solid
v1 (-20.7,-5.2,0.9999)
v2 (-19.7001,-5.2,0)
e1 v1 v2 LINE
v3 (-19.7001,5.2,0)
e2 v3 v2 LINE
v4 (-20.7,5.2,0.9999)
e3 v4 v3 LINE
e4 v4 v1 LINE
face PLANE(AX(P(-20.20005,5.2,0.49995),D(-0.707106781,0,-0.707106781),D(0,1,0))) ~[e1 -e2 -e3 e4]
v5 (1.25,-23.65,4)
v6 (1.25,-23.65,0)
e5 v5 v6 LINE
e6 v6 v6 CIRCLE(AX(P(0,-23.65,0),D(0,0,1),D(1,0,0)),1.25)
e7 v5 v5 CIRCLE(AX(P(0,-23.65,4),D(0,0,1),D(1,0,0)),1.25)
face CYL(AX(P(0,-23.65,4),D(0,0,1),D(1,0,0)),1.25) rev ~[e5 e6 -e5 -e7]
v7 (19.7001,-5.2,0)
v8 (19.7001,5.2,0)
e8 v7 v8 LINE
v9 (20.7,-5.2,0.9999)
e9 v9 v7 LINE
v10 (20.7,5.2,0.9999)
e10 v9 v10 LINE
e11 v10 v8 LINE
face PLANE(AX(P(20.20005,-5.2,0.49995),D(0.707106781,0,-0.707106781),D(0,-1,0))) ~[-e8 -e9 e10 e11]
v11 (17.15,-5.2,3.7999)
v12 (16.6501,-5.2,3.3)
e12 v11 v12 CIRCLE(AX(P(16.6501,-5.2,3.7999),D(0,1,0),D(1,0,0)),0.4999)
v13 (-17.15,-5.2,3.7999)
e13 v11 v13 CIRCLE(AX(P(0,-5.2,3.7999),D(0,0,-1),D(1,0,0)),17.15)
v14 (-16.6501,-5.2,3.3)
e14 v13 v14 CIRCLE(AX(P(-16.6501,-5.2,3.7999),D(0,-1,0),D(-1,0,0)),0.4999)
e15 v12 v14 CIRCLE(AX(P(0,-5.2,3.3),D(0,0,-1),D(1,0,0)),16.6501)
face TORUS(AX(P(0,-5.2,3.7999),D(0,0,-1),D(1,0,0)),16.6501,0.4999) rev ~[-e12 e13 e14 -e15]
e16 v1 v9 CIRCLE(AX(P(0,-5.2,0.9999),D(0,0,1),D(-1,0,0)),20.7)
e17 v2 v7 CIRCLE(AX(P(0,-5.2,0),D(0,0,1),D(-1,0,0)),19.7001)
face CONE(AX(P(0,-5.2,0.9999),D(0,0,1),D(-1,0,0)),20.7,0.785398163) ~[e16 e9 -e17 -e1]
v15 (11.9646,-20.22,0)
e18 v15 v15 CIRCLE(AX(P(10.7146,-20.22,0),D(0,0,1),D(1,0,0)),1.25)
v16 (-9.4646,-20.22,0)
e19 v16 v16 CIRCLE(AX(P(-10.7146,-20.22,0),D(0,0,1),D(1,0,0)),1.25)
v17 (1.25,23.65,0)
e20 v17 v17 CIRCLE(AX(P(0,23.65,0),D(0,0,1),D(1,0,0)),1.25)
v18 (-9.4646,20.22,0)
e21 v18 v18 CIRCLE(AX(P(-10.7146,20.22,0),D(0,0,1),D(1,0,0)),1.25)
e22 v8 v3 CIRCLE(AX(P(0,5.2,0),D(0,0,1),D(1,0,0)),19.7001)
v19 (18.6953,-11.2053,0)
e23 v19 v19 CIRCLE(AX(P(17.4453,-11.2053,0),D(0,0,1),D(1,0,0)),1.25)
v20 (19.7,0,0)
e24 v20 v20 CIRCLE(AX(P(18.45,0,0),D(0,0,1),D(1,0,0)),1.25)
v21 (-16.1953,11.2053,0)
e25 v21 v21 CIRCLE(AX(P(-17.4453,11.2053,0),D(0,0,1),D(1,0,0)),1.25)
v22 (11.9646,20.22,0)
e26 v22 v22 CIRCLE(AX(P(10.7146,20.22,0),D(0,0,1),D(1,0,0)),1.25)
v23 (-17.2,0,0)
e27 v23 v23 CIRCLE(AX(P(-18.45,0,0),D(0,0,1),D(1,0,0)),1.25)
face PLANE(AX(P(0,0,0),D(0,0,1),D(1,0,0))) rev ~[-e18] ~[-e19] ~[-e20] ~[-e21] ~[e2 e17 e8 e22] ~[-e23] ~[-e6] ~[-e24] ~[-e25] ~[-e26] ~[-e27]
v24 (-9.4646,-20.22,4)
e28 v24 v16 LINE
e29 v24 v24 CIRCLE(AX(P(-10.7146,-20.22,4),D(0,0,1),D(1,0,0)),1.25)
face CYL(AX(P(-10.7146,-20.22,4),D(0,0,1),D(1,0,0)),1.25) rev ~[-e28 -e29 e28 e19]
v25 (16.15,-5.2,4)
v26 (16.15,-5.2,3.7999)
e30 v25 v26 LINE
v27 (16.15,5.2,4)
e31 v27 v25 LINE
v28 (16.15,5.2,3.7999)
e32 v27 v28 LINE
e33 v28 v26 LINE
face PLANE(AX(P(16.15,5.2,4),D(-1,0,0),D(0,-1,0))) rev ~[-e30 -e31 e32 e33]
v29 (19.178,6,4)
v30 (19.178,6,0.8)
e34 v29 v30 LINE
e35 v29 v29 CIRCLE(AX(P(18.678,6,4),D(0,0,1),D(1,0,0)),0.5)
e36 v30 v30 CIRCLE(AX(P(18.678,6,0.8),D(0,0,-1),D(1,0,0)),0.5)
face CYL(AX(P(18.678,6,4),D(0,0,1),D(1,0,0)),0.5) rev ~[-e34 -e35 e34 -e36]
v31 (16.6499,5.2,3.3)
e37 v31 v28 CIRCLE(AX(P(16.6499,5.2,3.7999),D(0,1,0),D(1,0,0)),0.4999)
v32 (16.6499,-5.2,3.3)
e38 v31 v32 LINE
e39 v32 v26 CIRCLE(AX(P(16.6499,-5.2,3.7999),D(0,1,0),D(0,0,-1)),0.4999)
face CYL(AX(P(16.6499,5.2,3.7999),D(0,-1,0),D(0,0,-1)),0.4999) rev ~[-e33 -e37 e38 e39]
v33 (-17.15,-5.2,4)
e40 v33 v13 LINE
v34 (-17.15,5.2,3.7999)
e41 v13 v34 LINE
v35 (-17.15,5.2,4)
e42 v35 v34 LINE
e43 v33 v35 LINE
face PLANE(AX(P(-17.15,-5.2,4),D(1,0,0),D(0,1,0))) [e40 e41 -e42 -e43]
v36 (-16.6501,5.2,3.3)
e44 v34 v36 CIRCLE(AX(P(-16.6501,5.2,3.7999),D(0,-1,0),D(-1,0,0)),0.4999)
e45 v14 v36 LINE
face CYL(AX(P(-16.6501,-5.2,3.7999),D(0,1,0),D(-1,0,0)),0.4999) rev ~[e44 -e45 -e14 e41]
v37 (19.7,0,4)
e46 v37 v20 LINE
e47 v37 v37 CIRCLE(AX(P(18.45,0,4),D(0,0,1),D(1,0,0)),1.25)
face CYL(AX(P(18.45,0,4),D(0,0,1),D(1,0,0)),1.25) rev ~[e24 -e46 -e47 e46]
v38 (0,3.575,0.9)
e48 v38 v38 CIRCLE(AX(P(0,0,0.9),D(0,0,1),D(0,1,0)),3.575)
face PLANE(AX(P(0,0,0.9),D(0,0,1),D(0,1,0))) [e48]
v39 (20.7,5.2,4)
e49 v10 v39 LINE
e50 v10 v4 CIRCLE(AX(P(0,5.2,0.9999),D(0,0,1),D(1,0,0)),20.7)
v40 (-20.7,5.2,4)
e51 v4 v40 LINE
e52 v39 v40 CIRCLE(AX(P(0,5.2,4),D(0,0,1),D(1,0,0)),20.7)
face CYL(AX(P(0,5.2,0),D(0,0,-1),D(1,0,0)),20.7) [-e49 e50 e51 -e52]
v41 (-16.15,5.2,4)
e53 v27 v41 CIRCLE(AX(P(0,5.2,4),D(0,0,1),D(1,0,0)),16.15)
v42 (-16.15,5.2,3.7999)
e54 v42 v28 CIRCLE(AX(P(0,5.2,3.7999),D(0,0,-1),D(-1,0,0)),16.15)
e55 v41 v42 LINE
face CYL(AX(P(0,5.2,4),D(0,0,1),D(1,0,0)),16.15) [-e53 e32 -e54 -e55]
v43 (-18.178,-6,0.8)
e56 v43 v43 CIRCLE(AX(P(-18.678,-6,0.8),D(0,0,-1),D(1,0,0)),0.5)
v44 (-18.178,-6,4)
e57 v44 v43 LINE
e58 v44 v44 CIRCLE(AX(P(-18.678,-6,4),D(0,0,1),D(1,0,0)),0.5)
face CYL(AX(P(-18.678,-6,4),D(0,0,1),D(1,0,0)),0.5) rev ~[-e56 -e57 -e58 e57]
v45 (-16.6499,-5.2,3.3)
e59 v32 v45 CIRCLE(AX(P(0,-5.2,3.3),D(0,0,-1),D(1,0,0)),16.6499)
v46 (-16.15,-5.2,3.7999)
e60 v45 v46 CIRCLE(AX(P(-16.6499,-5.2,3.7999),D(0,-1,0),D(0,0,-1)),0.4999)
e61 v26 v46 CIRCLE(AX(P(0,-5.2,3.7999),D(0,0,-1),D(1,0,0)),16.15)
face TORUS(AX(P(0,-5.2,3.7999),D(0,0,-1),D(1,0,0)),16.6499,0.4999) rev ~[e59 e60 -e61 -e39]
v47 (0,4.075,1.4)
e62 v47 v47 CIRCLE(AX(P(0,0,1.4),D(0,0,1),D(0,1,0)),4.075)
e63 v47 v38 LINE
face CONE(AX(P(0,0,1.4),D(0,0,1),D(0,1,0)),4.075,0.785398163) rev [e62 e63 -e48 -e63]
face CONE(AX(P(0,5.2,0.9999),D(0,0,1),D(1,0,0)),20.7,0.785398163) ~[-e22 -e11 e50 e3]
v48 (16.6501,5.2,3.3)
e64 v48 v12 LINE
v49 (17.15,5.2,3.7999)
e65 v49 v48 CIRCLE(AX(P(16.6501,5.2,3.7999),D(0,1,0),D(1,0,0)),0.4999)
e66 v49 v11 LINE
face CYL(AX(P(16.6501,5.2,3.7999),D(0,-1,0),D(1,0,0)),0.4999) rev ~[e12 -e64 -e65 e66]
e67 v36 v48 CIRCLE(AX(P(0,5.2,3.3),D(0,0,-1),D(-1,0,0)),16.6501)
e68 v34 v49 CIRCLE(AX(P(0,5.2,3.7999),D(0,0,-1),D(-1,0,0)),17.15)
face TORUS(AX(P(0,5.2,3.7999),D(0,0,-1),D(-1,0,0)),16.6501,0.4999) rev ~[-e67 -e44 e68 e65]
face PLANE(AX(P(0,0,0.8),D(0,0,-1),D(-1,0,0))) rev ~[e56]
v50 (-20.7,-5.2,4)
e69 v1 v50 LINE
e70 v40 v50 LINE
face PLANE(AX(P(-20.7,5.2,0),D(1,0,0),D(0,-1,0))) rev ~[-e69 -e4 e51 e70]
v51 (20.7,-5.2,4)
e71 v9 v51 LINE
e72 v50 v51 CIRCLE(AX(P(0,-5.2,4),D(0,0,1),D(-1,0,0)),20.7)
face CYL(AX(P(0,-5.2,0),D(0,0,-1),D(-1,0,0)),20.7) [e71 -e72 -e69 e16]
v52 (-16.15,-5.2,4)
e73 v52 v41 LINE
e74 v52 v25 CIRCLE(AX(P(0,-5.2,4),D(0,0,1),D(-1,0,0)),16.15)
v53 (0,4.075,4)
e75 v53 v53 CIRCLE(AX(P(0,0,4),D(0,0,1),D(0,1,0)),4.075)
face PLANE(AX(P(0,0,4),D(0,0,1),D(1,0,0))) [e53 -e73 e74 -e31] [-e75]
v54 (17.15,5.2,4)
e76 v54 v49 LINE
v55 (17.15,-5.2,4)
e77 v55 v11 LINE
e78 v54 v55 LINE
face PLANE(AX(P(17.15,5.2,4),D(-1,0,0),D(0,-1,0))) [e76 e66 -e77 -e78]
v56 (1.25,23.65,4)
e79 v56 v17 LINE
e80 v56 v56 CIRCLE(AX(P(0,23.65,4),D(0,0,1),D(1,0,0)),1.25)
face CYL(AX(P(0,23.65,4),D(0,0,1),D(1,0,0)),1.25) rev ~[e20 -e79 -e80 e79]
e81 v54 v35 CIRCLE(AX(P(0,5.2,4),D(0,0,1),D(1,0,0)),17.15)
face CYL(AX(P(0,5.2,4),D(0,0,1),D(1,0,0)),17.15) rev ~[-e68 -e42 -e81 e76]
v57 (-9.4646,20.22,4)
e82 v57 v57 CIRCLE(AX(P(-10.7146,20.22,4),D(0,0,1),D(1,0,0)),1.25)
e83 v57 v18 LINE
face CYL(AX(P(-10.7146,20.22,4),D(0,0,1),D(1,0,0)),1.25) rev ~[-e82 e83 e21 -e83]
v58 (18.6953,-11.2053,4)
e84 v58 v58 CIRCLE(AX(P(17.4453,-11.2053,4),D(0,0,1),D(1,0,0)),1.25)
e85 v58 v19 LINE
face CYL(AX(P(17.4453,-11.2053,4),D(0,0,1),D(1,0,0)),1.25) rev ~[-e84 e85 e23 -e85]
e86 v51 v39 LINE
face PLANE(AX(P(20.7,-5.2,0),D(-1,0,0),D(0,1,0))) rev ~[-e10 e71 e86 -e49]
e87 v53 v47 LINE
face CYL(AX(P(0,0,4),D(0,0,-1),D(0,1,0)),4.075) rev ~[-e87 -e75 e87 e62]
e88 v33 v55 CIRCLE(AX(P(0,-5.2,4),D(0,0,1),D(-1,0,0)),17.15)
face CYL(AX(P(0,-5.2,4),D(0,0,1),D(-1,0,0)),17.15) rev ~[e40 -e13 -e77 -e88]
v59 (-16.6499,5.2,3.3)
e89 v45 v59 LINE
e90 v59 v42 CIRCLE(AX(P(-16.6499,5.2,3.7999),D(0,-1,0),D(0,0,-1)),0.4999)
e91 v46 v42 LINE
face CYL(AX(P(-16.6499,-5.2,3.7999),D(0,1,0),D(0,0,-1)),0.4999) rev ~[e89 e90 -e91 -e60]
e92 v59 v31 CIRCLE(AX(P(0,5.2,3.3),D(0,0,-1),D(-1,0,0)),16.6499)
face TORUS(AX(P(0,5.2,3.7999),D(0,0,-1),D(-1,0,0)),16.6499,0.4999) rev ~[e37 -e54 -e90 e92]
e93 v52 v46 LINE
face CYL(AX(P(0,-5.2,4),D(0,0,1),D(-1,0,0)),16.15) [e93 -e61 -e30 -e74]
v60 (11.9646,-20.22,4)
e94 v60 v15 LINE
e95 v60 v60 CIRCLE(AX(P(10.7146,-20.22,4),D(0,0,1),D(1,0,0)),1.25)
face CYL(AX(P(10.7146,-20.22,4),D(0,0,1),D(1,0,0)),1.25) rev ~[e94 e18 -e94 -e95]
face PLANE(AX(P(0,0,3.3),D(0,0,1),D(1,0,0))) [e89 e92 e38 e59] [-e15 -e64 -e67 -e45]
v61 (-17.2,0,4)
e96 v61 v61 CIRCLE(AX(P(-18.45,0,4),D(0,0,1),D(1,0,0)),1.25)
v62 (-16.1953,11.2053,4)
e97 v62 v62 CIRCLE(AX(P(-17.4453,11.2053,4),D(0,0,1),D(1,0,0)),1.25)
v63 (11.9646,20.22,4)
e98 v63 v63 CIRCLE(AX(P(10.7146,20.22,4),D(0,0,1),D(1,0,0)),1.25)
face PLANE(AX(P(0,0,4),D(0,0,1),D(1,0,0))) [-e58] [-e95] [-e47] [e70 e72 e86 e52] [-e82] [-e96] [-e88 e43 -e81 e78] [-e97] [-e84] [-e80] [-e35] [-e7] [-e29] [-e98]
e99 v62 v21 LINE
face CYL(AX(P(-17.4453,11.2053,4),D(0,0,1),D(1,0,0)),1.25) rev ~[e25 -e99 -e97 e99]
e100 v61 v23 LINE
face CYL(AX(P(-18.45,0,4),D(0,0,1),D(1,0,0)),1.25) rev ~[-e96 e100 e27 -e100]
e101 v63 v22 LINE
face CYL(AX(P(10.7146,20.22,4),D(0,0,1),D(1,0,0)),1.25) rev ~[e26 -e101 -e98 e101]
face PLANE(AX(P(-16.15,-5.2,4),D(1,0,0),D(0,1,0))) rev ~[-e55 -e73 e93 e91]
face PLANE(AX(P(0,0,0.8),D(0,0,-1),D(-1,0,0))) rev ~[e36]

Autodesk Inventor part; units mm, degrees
ref_plane "YZ Plane" through (0, 0, 0) normal (1, 0, 0) x (0, 1, 0)
ref_plane "XZ Plane" through (0, 0, 0) normal (0, 1, 0) x (-1, 0, 0)
ref_plane "XY Plane" through (0, 0, 0) normal (0, 0, 1) x (1, 0, 0)
sketch "Sketch1" plane through (0, 0, 0) normal (0, 0, 1) x (1, 0, 0)
  line L0 (0, 0) -> (0, 5.2) construction
  arc A0 (15.7051, 1.2264) -> (-15.7051, 1.2264) centre (0, 5.2) ccw construction
  line L1 (0, 0) -> (0, -5.2) construction
  arc A1 (-15.7051, -1.2264) -> (15.7051, -1.2264) centre (0, -5.2) ccw construction
  line L2 (0, 5.2) -> (0, -5.2) construction
  line L3 (-20.7, 5.2) -> (-20.7, -5.2)
  line L4 (20.7, -5.2) -> (20.7, 5.2)
  arc A2 (20.7, 5.2) -> (-20.7, 5.2) centre (0, 5.2) ccw
  arc A3 (-20.7, -5.2) -> (20.7, -5.2) centre (0, -5.2) ccw
  arc A4 (-15.7051, -1.2264) -> (-15.7051, 1.2264) centre (-20.5524, 0) ccw construction
  arc A5 (15.7051, 1.2264) -> (15.7051, -1.2264) centre (20.5524, 0) ccw construction
  line L5 (0, 5.2) -> (0, -5.2) construction
  circle A6 centre (0, 0) radius 14.5 construction
  dimension "d0" = 10.4
  dimension "d1" = 16.2
  dimension "d2" = 4.5
  dimension "d3" = 5
  dimension "d4" = 41.4
  dimension "d8" = 29
extrude "Extrusion1" add sketch "Sketch1" along normal blind 4
sketch "Sketch2" plane through (0, 0, 4) normal (0, 0, 1) x (1, 0, 0)
  line L0 (-20.7, 5.2) -> (-20.7, -5.2) construction
  arc A0 (-20.7, -5.2) -> (20.7, -5.2) centre (0, -5.2) ccw construction
  line L1 (20.7, -5.2) -> (20.7, 5.2) construction
  arc A1 (20.7, 5.2) -> (-20.7, 5.2) centre (0, 5.2) ccw construction
  line L2 (-18.45, 5.2) -> (-18.45, -5.2) construction
  arc A2 (-18.45, -5.2) -> (18.45, -5.2) centre (0, -5.2) ccw construction
  line L3 (18.45, -5.2) -> (18.45, 5.2) construction
  arc A3 (18.45, 5.2) -> (-18.45, 5.2) centre (0, 5.2) ccw construction
  circle A4 centre (-18.45, 0) radius 1.25
  circle A5 centre (0, 23.65) radius 1.25
  circle A6 centre (-10.7146, 20.22) radius 1.25
  circle A7 centre (-17.4453, 11.2053) radius 1.25
  line L4 (-18.45, 0) -> (-17.4453, 11.2053) construction
  line L5 (-17.4453, 11.2053) -> (-10.7146, 20.22) construction
  line L6 (-10.7146, 20.22) -> (0, 23.65) construction
  line L7 (-18.45, 0) -> (0, 0) construction
  line L8 (0, 0) -> (0, 23.65) construction
  circle A8 centre (18.45, 0) radius 1.25
  circle A9 centre (10.7146, 20.22) radius 1.25
  circle A10 centre (17.4453, 11.2053) radius 1.25
  circle A11 centre (0, -23.65) radius 1.25
  circle A12 centre (-10.7146, -20.22) radius 1.25
  circle A13 centre (-17.4453, -11.2053) radius 1.25
  circle A14 centre (10.7146, -20.22) radius 1.25
  circle A15 centre (17.4453, -11.2053) radius 1.25
  line L9 (-18.45, 0) -> (-18.45, -6) construction
  line L10 (-18.45, -6) -> (-18.678, -6) construction
  line L11 (18.45, 0) -> (18.45, 6) construction
  line L12 (18.45, 6) -> (18.678, 6) construction
  circle A16 centre (-18.678, -6) radius 0.5
  circle A17 centre (18.678, 6) radius 0.5
  dimension "d37" = 2.25
  dimension "d38" = 2.5
  dimension "d39" = 6
  dimension "d40" = 0.228
  dimension "d41" = 6
  dimension "d42" = 0.228
  dimension "d43" = 1
extrude "Extrusion2" cut sketch "Sketch2" against normal through all contours A4 | A5 | A6 | A7 | A8 | A9 | A11 | A12 | A14 | A15 | A16 | A17
sketch "Sketch5" plane through (0, 0, 4) normal (0, 0, 1) x (1, 0, 0)
  line L0 (20.7, -5.2) -> (20.7, 5.2) construction
  arc A0 (20.7, 5.2) -> (-20.7, 5.2) centre (0, 5.2) ccw construction
  line L1 (-20.7, 5.2) -> (-20.7, -5.2) construction
  arc A1 (-20.7, -5.2) -> (20.7, -5.2) centre (0, -5.2) ccw construction
  arc A2 (17.15, 5.2) -> (-17.15, 5.2) centre (0, 5.2) ccw
  line L2 (17.15, 5.2) -> (17.15, -5.2)
  arc A3 (-17.15, -5.2) -> (17.15, -5.2) centre (0, -5.2) ccw
  line L3 (-17.15, -5.2) -> (-17.15, 5.2)
  arc A4 (16.15, 5.2) -> (-16.15, 5.2) centre (0, 5.2) ccw
  line L4 (16.15, 5.2) -> (16.15, -5.2)
  arc A5 (-16.15, -5.2) -> (16.15, -5.2) centre (0, -5.2) ccw
  line L5 (-16.15, -5.2) -> (-16.15, 5.2)
  point P0 (0, 0)
  dimension "d20" = 1
extrude "Extrusion5" cut sketch "Sketch5" against normal blind 0.7
fillet "Fillet1" radius 0.5 8 edges at (17.15, 0, 3.3) (0, -22.35, 3.3) (-17.15, 0, 3.3) (0, 22.35, 3.3) (-16.15, 0, 3.3) (0, -21.35, 3.3) (16.15, 0, 3.3) (0, 21.35, 3.3)
chamfer "Chamfer1" distance 1 angle 45 4 edges at (0, -25.9, 0) (20.7, 0, 0) (0, 25.9, 0) (-20.7, 0, 0)
sketch "Sketch8" plane through (0, 0, 0) normal (1, 0, 0) x (0, 1, 0)
  line L0 (0, 0) -> (5.2, 0) construction
  line L1 (0, 0) -> (0, 0.9) construction
  line L2 (-5.2, 4) -> (5.2, 4) construction
  line L3 (0, 4) -> (4.075, 4)
  line L4 (4.075, 4) -> (4.075, 1.4)
  line L5 (4.075, 1.4) -> (3.575, 0.9)
  line L6 (3.575, 0.9) -> (0, 0.9)
  line L7 (0, 0.9) -> (0, 4)
  dimension "d44" = 4.075
  dimension "d45" = 135
  dimension "d46" = 2.6
  dimension "d47" = 0.5
  dimension "d48" = 0.9
revolve "Revolution1" cut sketch "Sketch8" angle 360 about axis through (0, 0, 0.9) along (0, 0, 1)
sketch "Sketch9" plane through (0, 0, 0) normal (0, 0, -1) x (-1, 0, 0)
  circle A0 centre (-18.678, 6) radius 0.5 projected
  circle A1 centre (18.678, -6) radius 0.5 projected
  point P0 (0, 0)
extrude "Extrusion8" add sketch "Sketch9" against normal blind 0.8
properties part number "housingPlate"
